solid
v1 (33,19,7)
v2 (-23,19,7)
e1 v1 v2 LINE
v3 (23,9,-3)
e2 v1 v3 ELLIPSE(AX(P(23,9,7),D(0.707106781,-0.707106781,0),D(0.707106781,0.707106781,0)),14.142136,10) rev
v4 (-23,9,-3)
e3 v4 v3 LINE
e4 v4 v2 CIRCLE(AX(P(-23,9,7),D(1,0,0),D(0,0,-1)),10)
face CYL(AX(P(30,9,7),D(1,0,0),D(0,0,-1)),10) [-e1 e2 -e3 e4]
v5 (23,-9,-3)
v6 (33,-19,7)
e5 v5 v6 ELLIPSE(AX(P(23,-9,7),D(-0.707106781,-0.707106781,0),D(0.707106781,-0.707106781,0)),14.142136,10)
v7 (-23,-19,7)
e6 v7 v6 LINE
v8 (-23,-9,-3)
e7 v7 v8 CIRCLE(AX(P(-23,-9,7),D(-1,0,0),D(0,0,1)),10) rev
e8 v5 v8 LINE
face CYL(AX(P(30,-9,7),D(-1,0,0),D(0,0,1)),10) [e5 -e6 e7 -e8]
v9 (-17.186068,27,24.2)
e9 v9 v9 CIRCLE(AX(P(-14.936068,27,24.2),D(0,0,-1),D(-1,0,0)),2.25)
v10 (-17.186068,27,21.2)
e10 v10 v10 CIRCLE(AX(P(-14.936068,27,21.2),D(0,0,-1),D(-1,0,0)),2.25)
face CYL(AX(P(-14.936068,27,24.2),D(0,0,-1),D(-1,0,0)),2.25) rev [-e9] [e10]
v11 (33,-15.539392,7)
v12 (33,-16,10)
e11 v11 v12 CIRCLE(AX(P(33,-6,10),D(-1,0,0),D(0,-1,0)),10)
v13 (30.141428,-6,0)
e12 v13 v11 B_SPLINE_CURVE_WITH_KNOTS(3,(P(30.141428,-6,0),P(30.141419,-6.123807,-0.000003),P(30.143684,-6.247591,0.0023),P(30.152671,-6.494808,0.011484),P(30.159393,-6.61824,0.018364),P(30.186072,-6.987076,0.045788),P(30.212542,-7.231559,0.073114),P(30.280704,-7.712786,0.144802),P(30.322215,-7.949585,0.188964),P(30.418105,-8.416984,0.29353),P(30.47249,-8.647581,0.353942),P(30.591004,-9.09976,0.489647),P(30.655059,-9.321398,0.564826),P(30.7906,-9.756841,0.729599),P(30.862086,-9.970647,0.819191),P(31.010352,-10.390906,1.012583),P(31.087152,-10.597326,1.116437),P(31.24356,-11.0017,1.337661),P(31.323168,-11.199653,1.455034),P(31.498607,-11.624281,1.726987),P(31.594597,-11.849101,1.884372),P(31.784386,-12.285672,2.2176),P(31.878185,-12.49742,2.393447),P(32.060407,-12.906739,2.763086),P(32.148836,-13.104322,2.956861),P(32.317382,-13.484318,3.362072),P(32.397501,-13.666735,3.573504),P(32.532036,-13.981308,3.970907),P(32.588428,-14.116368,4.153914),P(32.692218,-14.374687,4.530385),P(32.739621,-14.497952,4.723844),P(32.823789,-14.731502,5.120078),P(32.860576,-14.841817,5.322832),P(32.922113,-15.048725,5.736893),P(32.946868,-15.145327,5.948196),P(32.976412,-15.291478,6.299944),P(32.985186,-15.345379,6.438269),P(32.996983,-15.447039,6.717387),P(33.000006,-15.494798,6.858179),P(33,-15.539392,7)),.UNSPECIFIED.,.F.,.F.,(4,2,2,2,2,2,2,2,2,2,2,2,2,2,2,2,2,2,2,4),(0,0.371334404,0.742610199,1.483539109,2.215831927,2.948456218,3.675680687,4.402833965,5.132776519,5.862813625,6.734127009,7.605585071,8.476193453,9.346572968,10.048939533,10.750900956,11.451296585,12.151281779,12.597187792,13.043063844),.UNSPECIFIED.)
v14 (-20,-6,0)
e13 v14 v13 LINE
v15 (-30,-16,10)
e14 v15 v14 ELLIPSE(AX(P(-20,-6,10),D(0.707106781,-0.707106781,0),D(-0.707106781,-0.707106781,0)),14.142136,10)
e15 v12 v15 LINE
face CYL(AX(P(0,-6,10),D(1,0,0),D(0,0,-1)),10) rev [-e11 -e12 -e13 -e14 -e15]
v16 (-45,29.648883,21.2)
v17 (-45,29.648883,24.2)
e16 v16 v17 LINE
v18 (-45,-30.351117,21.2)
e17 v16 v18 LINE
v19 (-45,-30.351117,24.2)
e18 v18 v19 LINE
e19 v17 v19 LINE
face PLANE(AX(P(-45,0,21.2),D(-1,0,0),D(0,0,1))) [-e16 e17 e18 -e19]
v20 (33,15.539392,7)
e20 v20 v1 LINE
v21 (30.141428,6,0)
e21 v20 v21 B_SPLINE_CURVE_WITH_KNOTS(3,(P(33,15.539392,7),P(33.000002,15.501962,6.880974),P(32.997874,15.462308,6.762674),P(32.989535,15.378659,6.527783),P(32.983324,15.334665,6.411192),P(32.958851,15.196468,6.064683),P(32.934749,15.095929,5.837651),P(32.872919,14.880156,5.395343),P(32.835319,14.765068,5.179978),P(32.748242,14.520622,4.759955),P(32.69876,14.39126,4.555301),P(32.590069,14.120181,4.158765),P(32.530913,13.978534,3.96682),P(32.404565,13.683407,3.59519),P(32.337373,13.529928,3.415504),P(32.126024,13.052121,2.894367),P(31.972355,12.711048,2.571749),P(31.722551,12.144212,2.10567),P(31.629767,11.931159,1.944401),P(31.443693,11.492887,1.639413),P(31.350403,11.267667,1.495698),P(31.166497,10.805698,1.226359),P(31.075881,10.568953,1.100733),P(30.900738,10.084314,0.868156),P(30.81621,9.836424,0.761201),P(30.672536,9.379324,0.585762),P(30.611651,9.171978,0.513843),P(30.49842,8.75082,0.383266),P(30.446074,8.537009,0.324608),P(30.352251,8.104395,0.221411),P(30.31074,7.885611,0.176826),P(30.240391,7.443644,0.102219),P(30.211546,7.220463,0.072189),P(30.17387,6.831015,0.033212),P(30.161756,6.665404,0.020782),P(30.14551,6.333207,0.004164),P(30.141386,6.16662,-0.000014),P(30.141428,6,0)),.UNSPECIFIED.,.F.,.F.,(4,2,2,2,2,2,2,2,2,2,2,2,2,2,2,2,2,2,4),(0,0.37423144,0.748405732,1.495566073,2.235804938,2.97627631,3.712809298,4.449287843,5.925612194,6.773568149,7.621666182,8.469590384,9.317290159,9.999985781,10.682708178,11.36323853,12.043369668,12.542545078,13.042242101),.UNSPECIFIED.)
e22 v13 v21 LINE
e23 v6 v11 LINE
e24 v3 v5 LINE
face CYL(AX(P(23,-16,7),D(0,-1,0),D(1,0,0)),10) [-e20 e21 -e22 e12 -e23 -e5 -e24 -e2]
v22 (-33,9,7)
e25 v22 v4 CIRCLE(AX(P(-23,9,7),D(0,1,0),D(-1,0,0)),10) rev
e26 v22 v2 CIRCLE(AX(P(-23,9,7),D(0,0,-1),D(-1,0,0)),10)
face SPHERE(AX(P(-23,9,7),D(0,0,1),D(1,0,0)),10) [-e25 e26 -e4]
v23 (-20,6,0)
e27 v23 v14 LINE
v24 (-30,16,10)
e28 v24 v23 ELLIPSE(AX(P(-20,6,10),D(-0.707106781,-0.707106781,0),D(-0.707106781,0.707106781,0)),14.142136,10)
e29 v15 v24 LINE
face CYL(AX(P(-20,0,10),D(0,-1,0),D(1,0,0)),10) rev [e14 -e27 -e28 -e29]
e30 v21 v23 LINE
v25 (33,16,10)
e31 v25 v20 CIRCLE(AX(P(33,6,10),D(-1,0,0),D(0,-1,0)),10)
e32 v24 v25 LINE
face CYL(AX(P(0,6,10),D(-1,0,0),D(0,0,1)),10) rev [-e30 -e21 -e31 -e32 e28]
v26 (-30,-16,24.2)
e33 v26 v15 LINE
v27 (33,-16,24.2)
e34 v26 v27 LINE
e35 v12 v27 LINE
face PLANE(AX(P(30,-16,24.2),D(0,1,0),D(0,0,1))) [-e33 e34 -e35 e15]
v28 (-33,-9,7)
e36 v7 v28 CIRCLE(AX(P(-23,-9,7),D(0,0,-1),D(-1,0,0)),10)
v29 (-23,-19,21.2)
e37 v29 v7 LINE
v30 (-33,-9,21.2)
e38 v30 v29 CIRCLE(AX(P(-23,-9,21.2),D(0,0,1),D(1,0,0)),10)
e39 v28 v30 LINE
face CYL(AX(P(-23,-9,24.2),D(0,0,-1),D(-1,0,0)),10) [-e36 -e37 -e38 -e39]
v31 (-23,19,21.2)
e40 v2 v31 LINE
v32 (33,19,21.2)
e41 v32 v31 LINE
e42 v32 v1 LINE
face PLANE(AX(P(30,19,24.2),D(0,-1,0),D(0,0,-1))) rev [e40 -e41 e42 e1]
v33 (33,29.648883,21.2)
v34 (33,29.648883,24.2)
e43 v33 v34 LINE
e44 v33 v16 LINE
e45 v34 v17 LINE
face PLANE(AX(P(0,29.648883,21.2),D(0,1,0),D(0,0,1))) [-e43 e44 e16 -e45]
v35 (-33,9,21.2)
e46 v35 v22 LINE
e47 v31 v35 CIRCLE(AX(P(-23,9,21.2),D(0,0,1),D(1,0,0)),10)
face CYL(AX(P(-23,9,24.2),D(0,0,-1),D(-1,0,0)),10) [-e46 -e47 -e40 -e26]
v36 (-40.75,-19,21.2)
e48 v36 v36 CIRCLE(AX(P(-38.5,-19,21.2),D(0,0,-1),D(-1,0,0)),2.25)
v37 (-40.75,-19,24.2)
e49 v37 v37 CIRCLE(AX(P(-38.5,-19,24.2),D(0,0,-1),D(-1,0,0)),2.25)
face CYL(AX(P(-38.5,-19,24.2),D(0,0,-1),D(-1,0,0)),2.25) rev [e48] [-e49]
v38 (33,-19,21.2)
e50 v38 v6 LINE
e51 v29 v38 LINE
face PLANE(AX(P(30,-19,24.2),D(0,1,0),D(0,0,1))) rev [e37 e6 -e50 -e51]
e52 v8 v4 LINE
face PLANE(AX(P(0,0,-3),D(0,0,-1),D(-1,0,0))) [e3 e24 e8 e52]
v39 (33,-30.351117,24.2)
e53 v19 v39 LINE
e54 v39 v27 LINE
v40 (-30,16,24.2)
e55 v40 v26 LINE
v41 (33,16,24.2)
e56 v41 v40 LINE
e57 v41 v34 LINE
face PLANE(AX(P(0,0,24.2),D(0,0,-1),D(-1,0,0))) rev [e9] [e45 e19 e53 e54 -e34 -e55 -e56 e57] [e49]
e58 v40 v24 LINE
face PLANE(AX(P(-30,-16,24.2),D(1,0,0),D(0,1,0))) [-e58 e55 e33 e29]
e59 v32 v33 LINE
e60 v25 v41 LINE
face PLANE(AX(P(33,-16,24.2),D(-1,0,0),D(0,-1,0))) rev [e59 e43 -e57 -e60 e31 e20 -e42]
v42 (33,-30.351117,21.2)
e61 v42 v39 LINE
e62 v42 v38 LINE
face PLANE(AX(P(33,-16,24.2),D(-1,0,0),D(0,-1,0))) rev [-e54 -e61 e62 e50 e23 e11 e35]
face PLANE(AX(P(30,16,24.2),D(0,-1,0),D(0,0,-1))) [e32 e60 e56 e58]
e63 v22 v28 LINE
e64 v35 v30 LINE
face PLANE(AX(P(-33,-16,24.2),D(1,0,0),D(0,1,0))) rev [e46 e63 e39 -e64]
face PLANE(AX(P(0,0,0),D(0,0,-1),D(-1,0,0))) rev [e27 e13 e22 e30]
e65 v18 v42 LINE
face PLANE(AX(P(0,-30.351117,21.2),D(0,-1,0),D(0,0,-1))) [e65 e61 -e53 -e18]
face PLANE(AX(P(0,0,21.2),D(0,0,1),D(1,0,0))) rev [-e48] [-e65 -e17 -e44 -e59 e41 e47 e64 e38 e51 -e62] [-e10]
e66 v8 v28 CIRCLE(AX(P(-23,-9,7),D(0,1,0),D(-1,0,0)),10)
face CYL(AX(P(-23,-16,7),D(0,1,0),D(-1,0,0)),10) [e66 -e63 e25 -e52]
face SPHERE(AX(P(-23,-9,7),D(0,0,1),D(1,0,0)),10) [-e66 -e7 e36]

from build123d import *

# Parameters (mm, degrees)
SKETCH1_W           = 32
SKETCH1_H           = 60
BOSS_EXTRUDE1_DEPTH = 24.2
SHELL1_T            = 3
SKETCH3_W           = 3
SKETCH3_H           = 32
CUT_EXTRUDE1_DEPTH  = 24.2
BOSS_EXTRUDE2_START = 24.2
SKETCH4_W           = 60
SKETCH4_H           = 78
BOSS_EXTRUDE2_DEPTH = 3
CUT_EXTRUDE2_DEPTH  = 3
SKETCH6_R           = 2.25
CUT_EXTRUDE3_DEPTH  = 3
FILLET2_R           = 10
FILLET3_R           = 10
FILLET4_R           = 10


with BuildPart() as part:
    # Sketch1 → Boss-Extrude1 (new body)
    with BuildSketch(Plane(origin=(0, 0, 0), x_dir=(0, 1, 0), z_dir=(0, 0, 1))):
        Rectangle(SKETCH1_W, SKETCH1_H)
    extrude(amount=BOSS_EXTRUDE1_DEPTH)

    # Shell1
    shell1_openings = [part.faces().sort_by_distance(p)[0] for p in [
        (0, 0, 24.2),
    ]]
    offset(amount=SHELL1_T, openings=shell1_openings, kind=Kind.INTERSECTION)

    # Sketch3 → Cut-Extrude1 (cut)
    with BuildSketch(Plane.XY.offset(24.2)):
        with Locations((31.5, 0)):
            Rectangle(SKETCH3_W, SKETCH3_H)
    extrude(amount=-CUT_EXTRUDE1_DEPTH, mode=Mode.SUBTRACT)

    # Sketch4 → Boss-Extrude2 (add)
    with BuildSketch(Plane(origin=(0, 0, 0), x_dir=(0, 1, 0), z_dir=(0, 0, 1)).offset(BOSS_EXTRUDE2_START)):
        with Locations((-0.351117191, 6)):
            Rectangle(SKETCH4_W, SKETCH4_H)
    extrude(amount=-BOSS_EXTRUDE2_DEPTH)

    # Sketch5 → Cut-Extrude2 (cut)
    with BuildSketch(Plane.XY.offset(24.2)):
        Polygon((-30, -16), (30, -16), (33, -16), (33, -32.34351268), (43.583685091, -32.34351268), (43.583685091, 31.729117596), (33, 31.729117596), (33, 16), (30, 16), (-30, 16), align=None)
    extrude(amount=-CUT_EXTRUDE2_DEPTH, mode=Mode.SUBTRACT)

    # Sketch6 → Cut-Extrude3 (cut)
    with BuildSketch(Plane(origin=(0, 0, 21.2), x_dir=(1, 0, 0), z_dir=(0, 0, -1))):
        with Locations(Location((-14.936067977, -27, 0), (0, 0, 180))):
            Circle(SKETCH6_R)
        with Locations(Location((-38.5, 19, 0), (0, 0, 180))):
            Circle(SKETCH6_R)
    extrude(amount=-CUT_EXTRUDE3_DEPTH, mode=Mode.SUBTRACT)

    # Fillet2
    # the kernel refuses this fillet: 10 mm, written as the material it takes off along each edge
    with BuildSketch(Plane(origin=(-33, 44, -3), x_dir=(1, 0, 0), z_dir=(0, -1, 0))) as fillet2_piece_1:
        with BuildLine():
            CenterArc((FILLET2_R, FILLET2_R), FILLET2_R, 180, 90)
            Line((0, FILLET2_R), (0, 0))
            Line((0, 0), (FILLET2_R, 0))
        make_face()
    extrude(amount=88, mode=Mode.SUBTRACT)
    with BuildSketch(Plane(origin=(-58, -19, -3), x_dir=(0, 0, 1), z_dir=(1, 0, 0)), Plane(origin=(58, 19, -3), x_dir=(0, 0, 1), z_dir=(-1, 0, 0))) as fillet2_piece_2:
        with BuildLine():
            CenterArc((FILLET2_R, -FILLET2_R), FILLET2_R, 90, 90)
            Line((0, -FILLET2_R), (0, 0))
            Line((0, 0), (FILLET2_R, 0))
        make_face()
    extrude(amount=116, mode=Mode.SUBTRACT)
    with BuildSketch(Plane(origin=(33, -44, -3), x_dir=(0, 0, 1), z_dir=(0, 1, 0))) as fillet2_piece_3:
        with BuildLine():
            CenterArc((FILLET2_R, -FILLET2_R), FILLET2_R, 90, 90)
            Line((0, -FILLET2_R), (0, 0))
            Line((0, 0), (FILLET2_R, 0))
        make_face()
    extrude(amount=88, mode=Mode.SUBTRACT)

    # Fillet3
    fillet3_edges = [part.edges().sort_by_distance(p)[0] for p in [
        (0.070714214, 16, 0),
        (-30, 0, 0),
        (0.070714214, -16, 0),
    ]]
    fillet(fillet3_edges, radius=FILLET3_R)

    # Fillet4
    # the kernel refuses this fillet: 10 mm, written as the material it takes off along each edge
    with BuildSketch(Plane(origin=(-23, 9, 7), x_dir=(0, 1, 0), z_dir=(-1, 0, 0))) as fillet4_piece_1_section:
        Polygon((0, 0), (FILLET4_R * 1.02, 0), (FILLET4_R * 1.02, FILLET4_R * 1.02), (0, FILLET4_R * 1.02), align=None)
    fillet4_piece_1 = extrude(amount=FILLET4_R * 1.02, mode=Mode.PRIVATE)
    fillet4_piece_1 = fillet4_piece_1 - Plane(origin=(-23, 9, 7), x_dir=(0, -0.7071067811865475, 0.7071067811865475), z_dir=(-1, 0, 0)) * Sphere(FILLET4_R, mode=Mode.PRIVATE)
    add(fillet4_piece_1, mode=Mode.SUBTRACT)
    with BuildSketch(Plane(origin=(-23, -9, 7), x_dir=(-1, 0, 0), z_dir=(0, -1, 0))) as fillet4_piece_2_section:
        Polygon((0, 0), (FILLET4_R * 1.02, 0), (FILLET4_R * 1.02, FILLET4_R * 1.02), (0, FILLET4_R * 1.02), align=None)
    fillet4_piece_2 = extrude(amount=FILLET4_R * 1.02, mode=Mode.PRIVATE)
    fillet4_piece_2 = fillet4_piece_2 - Plane(origin=(-23, -9, 7), x_dir=(0.7071067811865475, 0, 0.7071067811865475), z_dir=(0, -1, 0)) * Sphere(FILLET4_R, mode=Mode.PRIVATE)
    add(fillet4_piece_2, mode=Mode.SUBTRACT)
    with BuildSketch(Plane(origin=(-33, -19, 7), x_dir=(1, 0, 0), z_dir=(0, 0, 1)), Plane(origin=(-33, 19, 7), x_dir=(0, -1, 0), z_dir=(0, 0, 1))) as fillet4_piece_3:
        with BuildLine():
            CenterArc((FILLET4_R, FILLET4_R), FILLET4_R, 180, 90)
            Line((0, FILLET4_R), (0, 0))
            Line((0, 0), (FILLET4_R, 0))
        make_face()
    extrude(amount=14.2, mode=Mode.SUBTRACT)


solid = part.part
